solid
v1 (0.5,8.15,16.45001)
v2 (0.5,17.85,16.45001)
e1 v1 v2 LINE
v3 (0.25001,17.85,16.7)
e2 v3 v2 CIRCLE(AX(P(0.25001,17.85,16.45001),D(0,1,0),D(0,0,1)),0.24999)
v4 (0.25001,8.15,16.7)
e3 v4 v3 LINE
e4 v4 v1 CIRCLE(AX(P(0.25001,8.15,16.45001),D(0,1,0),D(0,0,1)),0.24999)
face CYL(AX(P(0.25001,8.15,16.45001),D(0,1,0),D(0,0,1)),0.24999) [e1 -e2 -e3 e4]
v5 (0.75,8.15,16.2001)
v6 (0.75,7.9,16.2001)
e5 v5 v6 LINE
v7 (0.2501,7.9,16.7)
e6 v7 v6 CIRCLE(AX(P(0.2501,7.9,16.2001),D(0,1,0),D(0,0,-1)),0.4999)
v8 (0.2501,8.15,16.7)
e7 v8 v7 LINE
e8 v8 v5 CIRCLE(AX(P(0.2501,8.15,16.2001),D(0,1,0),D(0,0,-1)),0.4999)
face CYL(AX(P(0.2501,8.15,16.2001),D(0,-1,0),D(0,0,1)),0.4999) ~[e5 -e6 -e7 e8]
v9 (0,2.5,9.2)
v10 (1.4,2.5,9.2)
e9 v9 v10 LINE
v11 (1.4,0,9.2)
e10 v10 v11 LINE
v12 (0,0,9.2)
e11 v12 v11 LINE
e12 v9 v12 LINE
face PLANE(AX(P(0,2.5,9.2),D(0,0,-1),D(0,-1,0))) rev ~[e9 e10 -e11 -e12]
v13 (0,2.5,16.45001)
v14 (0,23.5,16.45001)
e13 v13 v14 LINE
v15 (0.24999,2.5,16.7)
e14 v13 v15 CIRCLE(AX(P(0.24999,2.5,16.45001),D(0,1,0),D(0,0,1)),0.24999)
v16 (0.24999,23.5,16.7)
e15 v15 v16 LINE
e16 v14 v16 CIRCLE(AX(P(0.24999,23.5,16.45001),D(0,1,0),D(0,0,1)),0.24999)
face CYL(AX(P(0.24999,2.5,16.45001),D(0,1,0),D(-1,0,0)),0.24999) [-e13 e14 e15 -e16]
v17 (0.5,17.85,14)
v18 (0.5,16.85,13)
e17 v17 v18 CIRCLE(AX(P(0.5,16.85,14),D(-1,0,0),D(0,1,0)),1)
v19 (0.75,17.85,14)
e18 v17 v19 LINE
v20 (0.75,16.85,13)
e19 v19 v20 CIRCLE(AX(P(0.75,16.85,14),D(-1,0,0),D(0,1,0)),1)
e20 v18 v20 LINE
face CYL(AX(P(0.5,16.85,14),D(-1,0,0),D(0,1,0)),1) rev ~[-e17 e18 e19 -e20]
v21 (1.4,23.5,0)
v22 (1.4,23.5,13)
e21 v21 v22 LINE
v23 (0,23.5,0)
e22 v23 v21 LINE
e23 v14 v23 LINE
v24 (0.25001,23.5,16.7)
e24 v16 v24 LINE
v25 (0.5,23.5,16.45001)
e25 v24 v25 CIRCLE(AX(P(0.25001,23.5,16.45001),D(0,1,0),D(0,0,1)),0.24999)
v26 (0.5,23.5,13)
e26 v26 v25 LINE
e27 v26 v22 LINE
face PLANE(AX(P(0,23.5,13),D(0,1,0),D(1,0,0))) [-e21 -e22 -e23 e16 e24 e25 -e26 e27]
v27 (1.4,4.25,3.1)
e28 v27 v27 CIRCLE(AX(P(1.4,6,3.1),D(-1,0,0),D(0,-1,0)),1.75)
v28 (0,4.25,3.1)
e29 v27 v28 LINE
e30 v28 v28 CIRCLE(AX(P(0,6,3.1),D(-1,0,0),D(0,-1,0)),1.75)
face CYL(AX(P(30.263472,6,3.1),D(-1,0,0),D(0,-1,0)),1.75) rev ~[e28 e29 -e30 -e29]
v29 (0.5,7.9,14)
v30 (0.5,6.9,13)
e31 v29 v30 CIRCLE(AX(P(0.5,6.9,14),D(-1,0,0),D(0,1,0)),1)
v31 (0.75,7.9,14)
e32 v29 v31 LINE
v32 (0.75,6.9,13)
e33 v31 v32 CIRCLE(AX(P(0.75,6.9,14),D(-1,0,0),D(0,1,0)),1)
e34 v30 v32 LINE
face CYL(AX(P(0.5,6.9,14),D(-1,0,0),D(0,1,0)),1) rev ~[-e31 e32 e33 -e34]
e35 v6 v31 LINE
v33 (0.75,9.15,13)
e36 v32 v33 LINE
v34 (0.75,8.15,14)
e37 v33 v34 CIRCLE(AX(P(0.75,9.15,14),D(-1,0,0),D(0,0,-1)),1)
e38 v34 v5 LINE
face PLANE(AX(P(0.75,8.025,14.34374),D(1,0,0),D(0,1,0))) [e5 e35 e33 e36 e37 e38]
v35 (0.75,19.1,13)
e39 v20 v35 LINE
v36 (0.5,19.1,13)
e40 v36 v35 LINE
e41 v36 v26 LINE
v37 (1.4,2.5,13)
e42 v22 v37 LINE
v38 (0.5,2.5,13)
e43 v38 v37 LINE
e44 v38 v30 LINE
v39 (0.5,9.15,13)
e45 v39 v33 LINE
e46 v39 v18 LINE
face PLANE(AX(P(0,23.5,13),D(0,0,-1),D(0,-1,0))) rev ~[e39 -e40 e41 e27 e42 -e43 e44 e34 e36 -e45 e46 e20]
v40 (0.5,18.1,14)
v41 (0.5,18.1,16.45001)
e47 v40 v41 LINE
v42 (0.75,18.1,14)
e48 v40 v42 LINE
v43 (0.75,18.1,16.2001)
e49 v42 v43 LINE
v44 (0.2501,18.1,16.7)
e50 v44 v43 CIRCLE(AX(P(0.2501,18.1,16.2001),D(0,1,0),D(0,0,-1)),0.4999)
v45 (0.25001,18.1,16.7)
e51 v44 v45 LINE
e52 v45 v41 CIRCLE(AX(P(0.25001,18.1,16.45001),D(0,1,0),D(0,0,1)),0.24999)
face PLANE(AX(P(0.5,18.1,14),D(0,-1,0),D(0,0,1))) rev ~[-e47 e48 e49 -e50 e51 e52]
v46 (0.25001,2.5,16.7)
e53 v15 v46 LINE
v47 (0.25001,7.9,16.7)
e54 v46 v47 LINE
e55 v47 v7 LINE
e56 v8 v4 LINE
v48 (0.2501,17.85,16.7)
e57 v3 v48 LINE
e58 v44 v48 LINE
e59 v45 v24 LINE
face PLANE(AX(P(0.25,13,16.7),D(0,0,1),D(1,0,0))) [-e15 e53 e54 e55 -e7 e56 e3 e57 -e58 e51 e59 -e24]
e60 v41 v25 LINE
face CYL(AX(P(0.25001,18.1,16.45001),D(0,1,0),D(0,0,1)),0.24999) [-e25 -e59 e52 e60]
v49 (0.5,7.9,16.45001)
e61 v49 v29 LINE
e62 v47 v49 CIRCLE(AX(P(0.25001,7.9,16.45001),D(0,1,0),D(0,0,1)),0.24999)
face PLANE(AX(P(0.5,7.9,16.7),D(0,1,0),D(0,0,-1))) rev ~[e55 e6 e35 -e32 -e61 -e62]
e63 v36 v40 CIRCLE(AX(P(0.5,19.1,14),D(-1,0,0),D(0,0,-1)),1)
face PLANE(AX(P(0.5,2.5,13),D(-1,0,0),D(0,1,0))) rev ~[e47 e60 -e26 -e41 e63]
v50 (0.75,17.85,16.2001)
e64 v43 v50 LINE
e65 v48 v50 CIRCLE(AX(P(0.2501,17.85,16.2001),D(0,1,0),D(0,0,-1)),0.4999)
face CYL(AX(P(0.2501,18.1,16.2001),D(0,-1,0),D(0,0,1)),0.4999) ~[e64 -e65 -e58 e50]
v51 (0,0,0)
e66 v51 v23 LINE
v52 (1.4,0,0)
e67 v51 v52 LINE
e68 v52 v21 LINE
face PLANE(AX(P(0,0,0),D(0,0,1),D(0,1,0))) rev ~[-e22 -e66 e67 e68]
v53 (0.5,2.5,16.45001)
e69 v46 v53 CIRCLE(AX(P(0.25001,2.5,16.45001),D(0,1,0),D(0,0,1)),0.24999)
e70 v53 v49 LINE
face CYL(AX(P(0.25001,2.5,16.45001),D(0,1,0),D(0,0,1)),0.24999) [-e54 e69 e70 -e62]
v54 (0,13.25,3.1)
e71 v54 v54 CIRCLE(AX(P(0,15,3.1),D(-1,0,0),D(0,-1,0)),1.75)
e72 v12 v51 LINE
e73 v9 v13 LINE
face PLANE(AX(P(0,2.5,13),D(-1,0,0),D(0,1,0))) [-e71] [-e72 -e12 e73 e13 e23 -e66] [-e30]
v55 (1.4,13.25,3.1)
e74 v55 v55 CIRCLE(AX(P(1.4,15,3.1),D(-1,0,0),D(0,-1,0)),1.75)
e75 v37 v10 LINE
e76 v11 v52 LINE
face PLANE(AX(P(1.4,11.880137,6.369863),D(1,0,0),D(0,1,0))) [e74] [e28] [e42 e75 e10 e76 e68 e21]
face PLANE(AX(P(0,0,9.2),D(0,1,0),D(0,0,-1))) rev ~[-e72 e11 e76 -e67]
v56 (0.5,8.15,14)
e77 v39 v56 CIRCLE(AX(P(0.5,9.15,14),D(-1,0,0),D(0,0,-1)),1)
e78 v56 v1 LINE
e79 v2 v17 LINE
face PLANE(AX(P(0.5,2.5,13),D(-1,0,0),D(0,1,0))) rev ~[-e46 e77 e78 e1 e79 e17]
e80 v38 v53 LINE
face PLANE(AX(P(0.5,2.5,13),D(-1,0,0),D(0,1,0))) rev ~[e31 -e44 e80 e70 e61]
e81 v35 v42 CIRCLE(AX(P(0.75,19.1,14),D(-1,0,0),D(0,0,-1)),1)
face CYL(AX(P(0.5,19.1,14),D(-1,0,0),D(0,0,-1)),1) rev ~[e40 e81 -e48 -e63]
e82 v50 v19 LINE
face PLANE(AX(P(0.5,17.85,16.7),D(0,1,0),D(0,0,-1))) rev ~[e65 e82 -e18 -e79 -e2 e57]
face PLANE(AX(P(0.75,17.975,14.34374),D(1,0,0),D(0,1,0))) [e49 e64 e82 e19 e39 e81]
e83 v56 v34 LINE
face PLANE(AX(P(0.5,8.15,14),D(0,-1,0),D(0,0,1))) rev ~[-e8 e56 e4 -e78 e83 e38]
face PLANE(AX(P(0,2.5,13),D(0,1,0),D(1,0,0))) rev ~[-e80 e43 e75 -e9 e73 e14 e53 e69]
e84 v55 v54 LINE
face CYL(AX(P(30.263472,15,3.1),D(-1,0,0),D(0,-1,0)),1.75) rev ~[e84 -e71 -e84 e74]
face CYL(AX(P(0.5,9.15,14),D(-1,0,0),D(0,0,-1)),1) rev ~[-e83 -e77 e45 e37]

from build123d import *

# Parameters (mm, degrees)
F1_DEPTH = 1.4
F2_W     = 0.5
F2_H     = 21
F3_DEPTH = 3.7
F5_D     = 3.5
F7_DEPTH = 0.25
F8_R     = 0.24999
F9_R     = 0.4999


# Not quite as in the source:
# - a fillet or chamfer is up to 0.001 mm smaller than in the source, because OpenCascade refuses the exact size


with BuildPart() as f1:
    # F0 (on Right) → F1 (new body)
    with BuildSketch(Plane.YZ):
        Polygon((0, 9.2), (0, 0), (23.5, 0), (23.5, 13), (2.5, 13), (2.5, 9.2), align=None)
    extrude(amount=F1_DEPTH)

    # F2 (on face) → F3 (join)
    with BuildSketch(Plane.XY.offset(13)):
        with Locations((0.25, 13)):
            Rectangle(F2_W, F2_H)
    extrude(amount=F3_DEPTH)

    # F5 (through all)
    with Locations(Plane.YZ.offset(1.4)):
        with Locations((6, 3.1), (15, 3.1)):
            Hole(F5_D / 2)

    # F6 (on face) → F7 (join)
    with BuildSketch(Plane.YZ.offset(0.5)):
        with BuildLine():
            Line((7.9, 16.7), (7.9, 14))
            ThreePointArc((7.9, 14), (7.6071067812, 13.2928932188), (6.9, 13))
            Line((6.9, 13), (7.9, 13))
            Line((7.9, 13), (8.15, 13))
            Line((8.15, 13), (9.15, 13))
            ThreePointArc((9.15, 13), (8.4428932188, 13.2928932188), (8.15, 14))
            Line((8.15, 14), (8.15, 16.7))
            Line((8.15, 16.7), (7.9, 16.7))
        make_face()
        with BuildLine():
            Line((18.1, 16.7), (17.85, 16.7))
            Line((17.85, 16.7), (17.85, 14))
            ThreePointArc((17.85, 14), (17.5571067812, 13.2928932188), (16.85, 13))
            Line((16.85, 13), (17.85, 13))
            Line((17.85, 13), (18.1, 13))
            Line((18.1, 13), (19.1, 13))
            ThreePointArc((19.1, 13), (18.3928932188, 13.2928932188), (18.1, 14))
            Line((18.1, 14), (18.1, 16.7))
        make_face()
    extrude(amount=F7_DEPTH)

    # F8 (radius 0.25 in the source; OpenCascade refuses exactly that, so slightly less here)
    f8_edges = [f1.edges().sort_by_distance(p)[0] for p in [
        (0, 13, 16.7),
        (0.5, 20.8, 16.7),
        (0.5, 13, 16.7),
        (0.5, 5.2, 16.7),
    ]]
    fillet(f8_edges, radius=F8_R)

    # F9 (radius 0.5 in the source; OpenCascade refuses exactly that, so slightly less here)
    f9_edges = [f1.edges().sort_by_distance(p)[0] for p in [
        (0.75, 8.025, 16.7),
        (0.75, 17.975, 16.7),
    ]]
    fillet(f9_edges, radius=F9_R)


solid = f1.part
